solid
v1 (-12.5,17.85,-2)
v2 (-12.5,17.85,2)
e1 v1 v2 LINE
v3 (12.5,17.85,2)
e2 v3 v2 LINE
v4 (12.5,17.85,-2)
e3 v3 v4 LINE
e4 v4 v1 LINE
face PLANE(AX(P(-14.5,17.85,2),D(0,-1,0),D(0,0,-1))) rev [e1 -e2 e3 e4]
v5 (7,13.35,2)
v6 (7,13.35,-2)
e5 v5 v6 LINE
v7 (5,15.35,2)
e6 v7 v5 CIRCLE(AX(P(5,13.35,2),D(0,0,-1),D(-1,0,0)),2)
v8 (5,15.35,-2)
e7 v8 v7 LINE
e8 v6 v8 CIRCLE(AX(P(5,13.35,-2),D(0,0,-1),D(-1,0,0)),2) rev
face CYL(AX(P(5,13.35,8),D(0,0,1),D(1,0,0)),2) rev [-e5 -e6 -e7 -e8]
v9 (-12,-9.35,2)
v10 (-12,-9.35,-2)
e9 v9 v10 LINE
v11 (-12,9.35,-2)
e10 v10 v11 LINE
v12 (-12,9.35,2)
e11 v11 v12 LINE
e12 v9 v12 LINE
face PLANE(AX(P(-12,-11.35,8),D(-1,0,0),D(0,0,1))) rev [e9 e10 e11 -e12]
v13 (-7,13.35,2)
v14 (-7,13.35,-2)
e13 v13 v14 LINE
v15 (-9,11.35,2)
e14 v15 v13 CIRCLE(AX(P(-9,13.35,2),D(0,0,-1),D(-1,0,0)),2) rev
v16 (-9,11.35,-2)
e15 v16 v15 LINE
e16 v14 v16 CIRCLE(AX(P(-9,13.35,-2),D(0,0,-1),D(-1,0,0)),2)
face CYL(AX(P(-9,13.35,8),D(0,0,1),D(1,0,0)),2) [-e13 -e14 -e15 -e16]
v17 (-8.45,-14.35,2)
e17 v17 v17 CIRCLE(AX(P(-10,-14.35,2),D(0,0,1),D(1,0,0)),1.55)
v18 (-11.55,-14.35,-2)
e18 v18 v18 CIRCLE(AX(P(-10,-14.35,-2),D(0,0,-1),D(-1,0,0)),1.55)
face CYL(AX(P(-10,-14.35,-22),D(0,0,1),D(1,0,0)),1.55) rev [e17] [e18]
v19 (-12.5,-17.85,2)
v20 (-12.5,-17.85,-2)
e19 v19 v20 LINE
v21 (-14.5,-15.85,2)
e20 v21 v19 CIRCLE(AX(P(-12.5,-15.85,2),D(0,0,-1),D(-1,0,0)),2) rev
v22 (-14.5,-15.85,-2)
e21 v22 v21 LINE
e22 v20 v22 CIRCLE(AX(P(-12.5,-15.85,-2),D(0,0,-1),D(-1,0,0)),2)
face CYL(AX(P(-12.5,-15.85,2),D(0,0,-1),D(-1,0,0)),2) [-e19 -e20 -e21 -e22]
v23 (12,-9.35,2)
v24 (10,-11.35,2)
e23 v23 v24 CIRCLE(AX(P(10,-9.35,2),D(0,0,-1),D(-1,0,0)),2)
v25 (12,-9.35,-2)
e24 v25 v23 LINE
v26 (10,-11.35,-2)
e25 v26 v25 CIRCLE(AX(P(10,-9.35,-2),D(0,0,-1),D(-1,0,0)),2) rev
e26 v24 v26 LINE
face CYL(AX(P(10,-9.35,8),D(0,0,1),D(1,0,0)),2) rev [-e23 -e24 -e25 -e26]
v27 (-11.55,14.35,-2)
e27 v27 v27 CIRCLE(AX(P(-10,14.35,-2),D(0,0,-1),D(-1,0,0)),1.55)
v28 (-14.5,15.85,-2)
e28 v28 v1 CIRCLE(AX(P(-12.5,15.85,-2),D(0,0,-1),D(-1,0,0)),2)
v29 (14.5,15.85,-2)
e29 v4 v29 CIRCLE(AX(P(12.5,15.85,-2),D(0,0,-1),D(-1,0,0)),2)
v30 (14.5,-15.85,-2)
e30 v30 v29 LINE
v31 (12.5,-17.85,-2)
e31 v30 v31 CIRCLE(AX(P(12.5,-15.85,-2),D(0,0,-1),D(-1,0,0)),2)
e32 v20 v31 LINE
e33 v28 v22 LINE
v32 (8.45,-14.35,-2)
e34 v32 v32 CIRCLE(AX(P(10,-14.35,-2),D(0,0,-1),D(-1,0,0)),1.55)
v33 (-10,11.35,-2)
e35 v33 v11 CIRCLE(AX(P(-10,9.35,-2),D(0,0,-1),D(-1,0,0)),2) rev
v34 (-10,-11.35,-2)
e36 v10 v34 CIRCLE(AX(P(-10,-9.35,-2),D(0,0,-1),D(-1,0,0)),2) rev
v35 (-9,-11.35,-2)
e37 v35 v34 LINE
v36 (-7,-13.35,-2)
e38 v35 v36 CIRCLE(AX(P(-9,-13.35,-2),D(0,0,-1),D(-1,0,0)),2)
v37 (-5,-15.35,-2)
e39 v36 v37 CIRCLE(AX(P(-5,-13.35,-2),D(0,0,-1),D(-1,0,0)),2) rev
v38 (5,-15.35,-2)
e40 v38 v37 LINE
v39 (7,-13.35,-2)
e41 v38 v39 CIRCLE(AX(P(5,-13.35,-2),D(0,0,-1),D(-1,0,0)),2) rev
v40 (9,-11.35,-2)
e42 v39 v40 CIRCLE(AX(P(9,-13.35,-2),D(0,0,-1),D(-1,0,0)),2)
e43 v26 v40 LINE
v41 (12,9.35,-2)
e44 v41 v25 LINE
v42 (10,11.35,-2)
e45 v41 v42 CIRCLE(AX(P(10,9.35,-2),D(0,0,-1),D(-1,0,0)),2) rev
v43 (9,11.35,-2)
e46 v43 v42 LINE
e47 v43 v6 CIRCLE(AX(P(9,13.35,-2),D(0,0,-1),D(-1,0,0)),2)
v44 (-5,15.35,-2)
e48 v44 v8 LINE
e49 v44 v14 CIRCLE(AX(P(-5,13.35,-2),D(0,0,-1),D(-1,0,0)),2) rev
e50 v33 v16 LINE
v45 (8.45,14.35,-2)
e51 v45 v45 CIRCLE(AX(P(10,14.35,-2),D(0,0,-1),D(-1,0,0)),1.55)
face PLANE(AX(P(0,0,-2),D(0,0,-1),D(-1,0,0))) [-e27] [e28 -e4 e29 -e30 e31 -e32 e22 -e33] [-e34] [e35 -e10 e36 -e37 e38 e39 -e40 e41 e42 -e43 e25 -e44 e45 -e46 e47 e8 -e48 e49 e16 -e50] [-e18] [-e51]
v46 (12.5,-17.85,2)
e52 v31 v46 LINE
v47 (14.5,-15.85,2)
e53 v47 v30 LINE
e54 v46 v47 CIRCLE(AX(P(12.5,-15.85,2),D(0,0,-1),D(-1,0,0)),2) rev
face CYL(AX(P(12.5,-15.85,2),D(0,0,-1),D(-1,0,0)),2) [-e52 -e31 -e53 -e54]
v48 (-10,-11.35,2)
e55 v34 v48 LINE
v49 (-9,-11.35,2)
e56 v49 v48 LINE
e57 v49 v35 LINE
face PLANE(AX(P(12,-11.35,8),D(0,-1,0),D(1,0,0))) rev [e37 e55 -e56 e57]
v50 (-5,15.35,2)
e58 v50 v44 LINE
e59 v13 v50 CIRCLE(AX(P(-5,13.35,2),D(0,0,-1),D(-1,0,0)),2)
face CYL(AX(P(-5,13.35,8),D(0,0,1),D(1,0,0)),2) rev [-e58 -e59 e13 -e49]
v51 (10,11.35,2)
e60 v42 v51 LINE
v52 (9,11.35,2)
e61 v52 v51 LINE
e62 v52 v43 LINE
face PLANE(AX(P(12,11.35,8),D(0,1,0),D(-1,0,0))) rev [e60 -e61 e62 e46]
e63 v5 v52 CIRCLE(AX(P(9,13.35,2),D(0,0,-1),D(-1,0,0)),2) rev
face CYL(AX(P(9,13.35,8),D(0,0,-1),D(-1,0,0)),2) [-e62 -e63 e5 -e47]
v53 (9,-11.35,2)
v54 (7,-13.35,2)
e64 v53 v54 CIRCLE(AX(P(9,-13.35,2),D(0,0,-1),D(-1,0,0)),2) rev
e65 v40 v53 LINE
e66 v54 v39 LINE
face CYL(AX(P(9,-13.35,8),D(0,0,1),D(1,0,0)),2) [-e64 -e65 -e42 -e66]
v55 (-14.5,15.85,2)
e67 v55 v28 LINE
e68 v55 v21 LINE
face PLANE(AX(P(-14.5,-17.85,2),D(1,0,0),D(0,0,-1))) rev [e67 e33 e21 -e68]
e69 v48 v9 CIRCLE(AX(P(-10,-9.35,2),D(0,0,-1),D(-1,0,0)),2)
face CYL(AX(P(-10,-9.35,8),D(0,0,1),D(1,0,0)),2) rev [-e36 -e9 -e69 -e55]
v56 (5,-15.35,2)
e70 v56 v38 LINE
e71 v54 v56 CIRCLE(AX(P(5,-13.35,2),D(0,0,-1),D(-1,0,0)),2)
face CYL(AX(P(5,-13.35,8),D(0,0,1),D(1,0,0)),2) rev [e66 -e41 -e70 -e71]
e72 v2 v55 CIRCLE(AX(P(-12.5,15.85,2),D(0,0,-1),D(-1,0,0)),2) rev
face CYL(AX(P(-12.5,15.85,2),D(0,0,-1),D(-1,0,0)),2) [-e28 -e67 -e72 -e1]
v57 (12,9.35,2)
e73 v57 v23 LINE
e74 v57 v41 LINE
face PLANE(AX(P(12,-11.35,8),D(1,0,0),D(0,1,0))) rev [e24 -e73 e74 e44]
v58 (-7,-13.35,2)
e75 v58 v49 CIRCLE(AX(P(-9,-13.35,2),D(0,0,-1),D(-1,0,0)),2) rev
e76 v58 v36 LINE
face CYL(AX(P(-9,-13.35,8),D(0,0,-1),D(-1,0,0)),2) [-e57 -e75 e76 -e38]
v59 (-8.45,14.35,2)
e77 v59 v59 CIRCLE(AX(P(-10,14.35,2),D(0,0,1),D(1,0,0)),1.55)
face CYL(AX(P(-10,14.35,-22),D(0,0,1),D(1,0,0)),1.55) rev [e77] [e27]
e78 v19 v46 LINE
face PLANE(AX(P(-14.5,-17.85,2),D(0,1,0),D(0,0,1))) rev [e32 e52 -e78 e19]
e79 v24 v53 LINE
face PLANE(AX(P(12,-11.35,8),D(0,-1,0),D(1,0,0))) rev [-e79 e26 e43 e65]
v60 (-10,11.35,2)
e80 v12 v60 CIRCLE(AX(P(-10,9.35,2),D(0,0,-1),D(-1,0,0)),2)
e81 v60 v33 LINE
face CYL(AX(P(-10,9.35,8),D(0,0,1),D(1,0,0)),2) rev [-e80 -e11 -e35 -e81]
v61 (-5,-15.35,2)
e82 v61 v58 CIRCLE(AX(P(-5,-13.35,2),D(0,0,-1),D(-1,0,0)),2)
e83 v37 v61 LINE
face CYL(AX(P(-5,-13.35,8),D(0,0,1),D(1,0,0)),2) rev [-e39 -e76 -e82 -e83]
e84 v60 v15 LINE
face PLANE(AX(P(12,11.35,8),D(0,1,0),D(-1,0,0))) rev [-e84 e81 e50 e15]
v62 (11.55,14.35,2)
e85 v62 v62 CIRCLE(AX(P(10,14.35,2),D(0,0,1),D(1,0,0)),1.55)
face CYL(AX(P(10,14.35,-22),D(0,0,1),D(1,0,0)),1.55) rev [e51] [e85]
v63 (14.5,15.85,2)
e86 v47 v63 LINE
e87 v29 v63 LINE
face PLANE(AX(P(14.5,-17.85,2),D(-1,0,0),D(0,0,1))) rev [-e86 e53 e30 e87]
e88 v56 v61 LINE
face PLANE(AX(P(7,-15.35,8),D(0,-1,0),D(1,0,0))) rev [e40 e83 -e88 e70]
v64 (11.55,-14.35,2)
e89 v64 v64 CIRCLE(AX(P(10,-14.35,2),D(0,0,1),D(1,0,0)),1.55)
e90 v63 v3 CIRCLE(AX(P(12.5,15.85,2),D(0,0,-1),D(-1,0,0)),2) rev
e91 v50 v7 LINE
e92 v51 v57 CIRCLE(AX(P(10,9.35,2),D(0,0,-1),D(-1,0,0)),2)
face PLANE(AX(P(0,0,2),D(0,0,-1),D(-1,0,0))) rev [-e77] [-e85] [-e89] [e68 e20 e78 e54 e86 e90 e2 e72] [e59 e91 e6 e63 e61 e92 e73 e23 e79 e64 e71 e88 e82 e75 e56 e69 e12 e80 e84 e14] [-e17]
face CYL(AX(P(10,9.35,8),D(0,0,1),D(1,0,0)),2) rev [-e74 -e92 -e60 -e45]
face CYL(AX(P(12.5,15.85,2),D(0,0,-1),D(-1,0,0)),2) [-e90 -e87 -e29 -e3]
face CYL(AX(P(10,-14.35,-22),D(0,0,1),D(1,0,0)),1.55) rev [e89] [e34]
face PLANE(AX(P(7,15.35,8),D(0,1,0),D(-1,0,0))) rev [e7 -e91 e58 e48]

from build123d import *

# Parameters (mm, degrees)
SKETCH_1_W          = 29
SKETCH_1_H          = 35.7
EXTRUDE_1_DEPTH     = 2
SKETCH_2_R          = 1.55
CUT_EXTRUDE_1_DEPTH = 24
SKETCH_4_W          = 24
SKETCH_4_H          = 22.7
CUT_EXTRUDE_2_DEPTH = 10
SKETCH_5_W          = 14
SKETCH_5_H          = 30.7
CUT_EXTRUDE_3_DEPTH = 10
FILLET_START        = -2
FILLET_1_DEPTH      = 4
FILLET_1_2_DEPTH    = 4


with BuildPart() as part:
    # 草图1 → 凸台-拉伸1 (new, symmetric)
    with BuildSketch(Plane.XY):
        Rectangle(SKETCH_1_W, SKETCH_1_H)
    extrude(amount=EXTRUDE_1_DEPTH, both=True)

    # 草图2 → 切除-拉伸1 (cut)
    with BuildSketch(Plane.XY.offset(2)):
        with Locations((10, 14.35)):
            Circle(SKETCH_2_R)
        with Locations((10, -14.35)):
            Circle(SKETCH_2_R)
        with Locations((-10, -14.35)):
            Circle(SKETCH_2_R)
        with Locations((-10, 14.35)):
            Circle(SKETCH_2_R)
    extrude(amount=-CUT_EXTRUDE_1_DEPTH, mode=Mode.SUBTRACT)

    # 草图4 → 切除-拉伸2 (cut)
    with BuildSketch(Plane(origin=(0, 0, -2), x_dir=(-1, 0, 0), z_dir=(0, 0, -1))):
        Rectangle(SKETCH_4_W, SKETCH_4_H)
    extrude(amount=-CUT_EXTRUDE_2_DEPTH, mode=Mode.SUBTRACT)

    # 草图5 → 切除-拉伸3 (cut)
    with BuildSketch(Plane(origin=(0, 0, -2), x_dir=(-1, 0, 0), z_dir=(0, 0, -1))):
        Rectangle(SKETCH_5_W, SKETCH_5_H)
    extrude(amount=-CUT_EXTRUDE_3_DEPTH, mode=Mode.SUBTRACT)

    # 圆角1: read off the stored shape, not the designer's step
    # 圆角1 outline → 圆角1 (cut)
    with BuildSketch(Plane.XY.offset(FILLET_START)):
        with BuildLine():
            Line((14.5, -17.85), (14.5, -15.85))
            ThreePointArc((14.5, -15.85), (13.914213562, -17.264213562), (12.5, -17.85))
            Line((12.5, -17.85), (14.5, -17.85))
        make_face()
        with BuildLine():
            ThreePointArc((12.5, 17.85), (13.914213562, 17.264213562), (14.5, 15.85))
            Line((14.5, 15.85), (14.5, 17.85))
            Line((14.5, 17.85), (12.5, 17.85))
        make_face()
        with BuildLine():
            Line((-14.5, -17.85), (-12.5, -17.85))
            ThreePointArc((-12.5, -17.85), (-13.914213562, -17.264213562), (-14.5, -15.85))
            Line((-14.5, -15.85), (-14.5, -17.85))
        make_face()
        with BuildLine():
            ThreePointArc((-14.5, 15.85), (-13.914213562, 17.264213562), (-12.5, 17.85))
            Line((-12.5, 17.85), (-14.5, 17.85))
            Line((-14.5, 17.85), (-14.5, 15.85))
        make_face()
        with BuildLine():
            ThreePointArc((7, -13.35), (7.585786438, -11.935786438), (9, -11.35))
            Line((9, -11.35), (7, -11.35))
            Line((7, -11.35), (7, -13.35))
        make_face()
        with BuildLine():
            ThreePointArc((-9, -11.35), (-7.585786438, -11.935786438), (-7, -13.35))
            Line((-7, -13.35), (-7, -11.35))
            Line((-7, -11.35), (-9, -11.35))
        make_face()
        with BuildLine():
            Line((7, 11.35), (9, 11.35))
            ThreePointArc((9, 11.35), (7.585786438, 11.935786438), (7, 13.35))
            Line((7, 13.35), (7, 11.35))
        make_face()
        with BuildLine():
            Line((-7, 11.35), (-7, 13.35))
            ThreePointArc((-7, 13.35), (-7.585786438, 11.935786438), (-9, 11.35))
            Line((-9, 11.35), (-7, 11.35))
        make_face()
    extrude(amount=FILLET_1_DEPTH, mode=Mode.SUBTRACT)

    # Fillet 1 2 outline → Fillet 1 2 (add)
    with BuildSketch(Plane.XY.offset(FILLET_START)):
        with BuildLine():
            Line((7, -15.35), (7, -13.35))
            ThreePointArc((7, -13.35), (6.414213562, -14.764213562), (5, -15.35))
            Line((5, -15.35), (7, -15.35))
        make_face()
        with BuildLine():
            ThreePointArc((12, -9.35), (11.414213562, -10.764213562), (10, -11.35))
            Line((10, -11.35), (12, -11.35))
            Line((12, -11.35), (12, -9.35))
        make_face()
        with BuildLine():
            Line((-7, -15.35), (-5, -15.35))
            ThreePointArc((-5, -15.35), (-6.414213562, -14.764213562), (-7, -13.35))
            Line((-7, -13.35), (-7, -15.35))
        make_face()
        with BuildLine():
            ThreePointArc((10, 11.35), (11.414213562, 10.764213562), (12, 9.35))
            Line((12, 9.35), (12, 11.35))
            Line((12, 11.35), (10, 11.35))
        make_face()
        with BuildLine():
            Line((-12, -11.35), (-10, -11.35))
            ThreePointArc((-10, -11.35), (-11.414213562, -10.764213562), (-12, -9.35))
            Line((-12, -9.35), (-12, -11.35))
        make_face()
        with BuildLine():
            ThreePointArc((5, 15.35), (6.414213562, 14.764213562), (7, 13.35))
            Line((7, 13.35), (7, 15.35))
            Line((7, 15.35), (5, 15.35))
        make_face()
        with BuildLine():
            Line((-12, 11.35), (-12, 9.35))
            ThreePointArc((-12, 9.35), (-11.414213562, 10.764213562), (-10, 11.35))
            Line((-10, 11.35), (-12, 11.35))
        make_face()
        with BuildLine():
            ThreePointArc((-7, 13.35), (-6.414213562, 14.764213562), (-5, 15.35))
            Line((-5, 15.35), (-7, 15.35))
            Line((-7, 15.35), (-7, 13.35))
        make_face()
    extrude(amount=FILLET_1_2_DEPTH)


solid = part.part
